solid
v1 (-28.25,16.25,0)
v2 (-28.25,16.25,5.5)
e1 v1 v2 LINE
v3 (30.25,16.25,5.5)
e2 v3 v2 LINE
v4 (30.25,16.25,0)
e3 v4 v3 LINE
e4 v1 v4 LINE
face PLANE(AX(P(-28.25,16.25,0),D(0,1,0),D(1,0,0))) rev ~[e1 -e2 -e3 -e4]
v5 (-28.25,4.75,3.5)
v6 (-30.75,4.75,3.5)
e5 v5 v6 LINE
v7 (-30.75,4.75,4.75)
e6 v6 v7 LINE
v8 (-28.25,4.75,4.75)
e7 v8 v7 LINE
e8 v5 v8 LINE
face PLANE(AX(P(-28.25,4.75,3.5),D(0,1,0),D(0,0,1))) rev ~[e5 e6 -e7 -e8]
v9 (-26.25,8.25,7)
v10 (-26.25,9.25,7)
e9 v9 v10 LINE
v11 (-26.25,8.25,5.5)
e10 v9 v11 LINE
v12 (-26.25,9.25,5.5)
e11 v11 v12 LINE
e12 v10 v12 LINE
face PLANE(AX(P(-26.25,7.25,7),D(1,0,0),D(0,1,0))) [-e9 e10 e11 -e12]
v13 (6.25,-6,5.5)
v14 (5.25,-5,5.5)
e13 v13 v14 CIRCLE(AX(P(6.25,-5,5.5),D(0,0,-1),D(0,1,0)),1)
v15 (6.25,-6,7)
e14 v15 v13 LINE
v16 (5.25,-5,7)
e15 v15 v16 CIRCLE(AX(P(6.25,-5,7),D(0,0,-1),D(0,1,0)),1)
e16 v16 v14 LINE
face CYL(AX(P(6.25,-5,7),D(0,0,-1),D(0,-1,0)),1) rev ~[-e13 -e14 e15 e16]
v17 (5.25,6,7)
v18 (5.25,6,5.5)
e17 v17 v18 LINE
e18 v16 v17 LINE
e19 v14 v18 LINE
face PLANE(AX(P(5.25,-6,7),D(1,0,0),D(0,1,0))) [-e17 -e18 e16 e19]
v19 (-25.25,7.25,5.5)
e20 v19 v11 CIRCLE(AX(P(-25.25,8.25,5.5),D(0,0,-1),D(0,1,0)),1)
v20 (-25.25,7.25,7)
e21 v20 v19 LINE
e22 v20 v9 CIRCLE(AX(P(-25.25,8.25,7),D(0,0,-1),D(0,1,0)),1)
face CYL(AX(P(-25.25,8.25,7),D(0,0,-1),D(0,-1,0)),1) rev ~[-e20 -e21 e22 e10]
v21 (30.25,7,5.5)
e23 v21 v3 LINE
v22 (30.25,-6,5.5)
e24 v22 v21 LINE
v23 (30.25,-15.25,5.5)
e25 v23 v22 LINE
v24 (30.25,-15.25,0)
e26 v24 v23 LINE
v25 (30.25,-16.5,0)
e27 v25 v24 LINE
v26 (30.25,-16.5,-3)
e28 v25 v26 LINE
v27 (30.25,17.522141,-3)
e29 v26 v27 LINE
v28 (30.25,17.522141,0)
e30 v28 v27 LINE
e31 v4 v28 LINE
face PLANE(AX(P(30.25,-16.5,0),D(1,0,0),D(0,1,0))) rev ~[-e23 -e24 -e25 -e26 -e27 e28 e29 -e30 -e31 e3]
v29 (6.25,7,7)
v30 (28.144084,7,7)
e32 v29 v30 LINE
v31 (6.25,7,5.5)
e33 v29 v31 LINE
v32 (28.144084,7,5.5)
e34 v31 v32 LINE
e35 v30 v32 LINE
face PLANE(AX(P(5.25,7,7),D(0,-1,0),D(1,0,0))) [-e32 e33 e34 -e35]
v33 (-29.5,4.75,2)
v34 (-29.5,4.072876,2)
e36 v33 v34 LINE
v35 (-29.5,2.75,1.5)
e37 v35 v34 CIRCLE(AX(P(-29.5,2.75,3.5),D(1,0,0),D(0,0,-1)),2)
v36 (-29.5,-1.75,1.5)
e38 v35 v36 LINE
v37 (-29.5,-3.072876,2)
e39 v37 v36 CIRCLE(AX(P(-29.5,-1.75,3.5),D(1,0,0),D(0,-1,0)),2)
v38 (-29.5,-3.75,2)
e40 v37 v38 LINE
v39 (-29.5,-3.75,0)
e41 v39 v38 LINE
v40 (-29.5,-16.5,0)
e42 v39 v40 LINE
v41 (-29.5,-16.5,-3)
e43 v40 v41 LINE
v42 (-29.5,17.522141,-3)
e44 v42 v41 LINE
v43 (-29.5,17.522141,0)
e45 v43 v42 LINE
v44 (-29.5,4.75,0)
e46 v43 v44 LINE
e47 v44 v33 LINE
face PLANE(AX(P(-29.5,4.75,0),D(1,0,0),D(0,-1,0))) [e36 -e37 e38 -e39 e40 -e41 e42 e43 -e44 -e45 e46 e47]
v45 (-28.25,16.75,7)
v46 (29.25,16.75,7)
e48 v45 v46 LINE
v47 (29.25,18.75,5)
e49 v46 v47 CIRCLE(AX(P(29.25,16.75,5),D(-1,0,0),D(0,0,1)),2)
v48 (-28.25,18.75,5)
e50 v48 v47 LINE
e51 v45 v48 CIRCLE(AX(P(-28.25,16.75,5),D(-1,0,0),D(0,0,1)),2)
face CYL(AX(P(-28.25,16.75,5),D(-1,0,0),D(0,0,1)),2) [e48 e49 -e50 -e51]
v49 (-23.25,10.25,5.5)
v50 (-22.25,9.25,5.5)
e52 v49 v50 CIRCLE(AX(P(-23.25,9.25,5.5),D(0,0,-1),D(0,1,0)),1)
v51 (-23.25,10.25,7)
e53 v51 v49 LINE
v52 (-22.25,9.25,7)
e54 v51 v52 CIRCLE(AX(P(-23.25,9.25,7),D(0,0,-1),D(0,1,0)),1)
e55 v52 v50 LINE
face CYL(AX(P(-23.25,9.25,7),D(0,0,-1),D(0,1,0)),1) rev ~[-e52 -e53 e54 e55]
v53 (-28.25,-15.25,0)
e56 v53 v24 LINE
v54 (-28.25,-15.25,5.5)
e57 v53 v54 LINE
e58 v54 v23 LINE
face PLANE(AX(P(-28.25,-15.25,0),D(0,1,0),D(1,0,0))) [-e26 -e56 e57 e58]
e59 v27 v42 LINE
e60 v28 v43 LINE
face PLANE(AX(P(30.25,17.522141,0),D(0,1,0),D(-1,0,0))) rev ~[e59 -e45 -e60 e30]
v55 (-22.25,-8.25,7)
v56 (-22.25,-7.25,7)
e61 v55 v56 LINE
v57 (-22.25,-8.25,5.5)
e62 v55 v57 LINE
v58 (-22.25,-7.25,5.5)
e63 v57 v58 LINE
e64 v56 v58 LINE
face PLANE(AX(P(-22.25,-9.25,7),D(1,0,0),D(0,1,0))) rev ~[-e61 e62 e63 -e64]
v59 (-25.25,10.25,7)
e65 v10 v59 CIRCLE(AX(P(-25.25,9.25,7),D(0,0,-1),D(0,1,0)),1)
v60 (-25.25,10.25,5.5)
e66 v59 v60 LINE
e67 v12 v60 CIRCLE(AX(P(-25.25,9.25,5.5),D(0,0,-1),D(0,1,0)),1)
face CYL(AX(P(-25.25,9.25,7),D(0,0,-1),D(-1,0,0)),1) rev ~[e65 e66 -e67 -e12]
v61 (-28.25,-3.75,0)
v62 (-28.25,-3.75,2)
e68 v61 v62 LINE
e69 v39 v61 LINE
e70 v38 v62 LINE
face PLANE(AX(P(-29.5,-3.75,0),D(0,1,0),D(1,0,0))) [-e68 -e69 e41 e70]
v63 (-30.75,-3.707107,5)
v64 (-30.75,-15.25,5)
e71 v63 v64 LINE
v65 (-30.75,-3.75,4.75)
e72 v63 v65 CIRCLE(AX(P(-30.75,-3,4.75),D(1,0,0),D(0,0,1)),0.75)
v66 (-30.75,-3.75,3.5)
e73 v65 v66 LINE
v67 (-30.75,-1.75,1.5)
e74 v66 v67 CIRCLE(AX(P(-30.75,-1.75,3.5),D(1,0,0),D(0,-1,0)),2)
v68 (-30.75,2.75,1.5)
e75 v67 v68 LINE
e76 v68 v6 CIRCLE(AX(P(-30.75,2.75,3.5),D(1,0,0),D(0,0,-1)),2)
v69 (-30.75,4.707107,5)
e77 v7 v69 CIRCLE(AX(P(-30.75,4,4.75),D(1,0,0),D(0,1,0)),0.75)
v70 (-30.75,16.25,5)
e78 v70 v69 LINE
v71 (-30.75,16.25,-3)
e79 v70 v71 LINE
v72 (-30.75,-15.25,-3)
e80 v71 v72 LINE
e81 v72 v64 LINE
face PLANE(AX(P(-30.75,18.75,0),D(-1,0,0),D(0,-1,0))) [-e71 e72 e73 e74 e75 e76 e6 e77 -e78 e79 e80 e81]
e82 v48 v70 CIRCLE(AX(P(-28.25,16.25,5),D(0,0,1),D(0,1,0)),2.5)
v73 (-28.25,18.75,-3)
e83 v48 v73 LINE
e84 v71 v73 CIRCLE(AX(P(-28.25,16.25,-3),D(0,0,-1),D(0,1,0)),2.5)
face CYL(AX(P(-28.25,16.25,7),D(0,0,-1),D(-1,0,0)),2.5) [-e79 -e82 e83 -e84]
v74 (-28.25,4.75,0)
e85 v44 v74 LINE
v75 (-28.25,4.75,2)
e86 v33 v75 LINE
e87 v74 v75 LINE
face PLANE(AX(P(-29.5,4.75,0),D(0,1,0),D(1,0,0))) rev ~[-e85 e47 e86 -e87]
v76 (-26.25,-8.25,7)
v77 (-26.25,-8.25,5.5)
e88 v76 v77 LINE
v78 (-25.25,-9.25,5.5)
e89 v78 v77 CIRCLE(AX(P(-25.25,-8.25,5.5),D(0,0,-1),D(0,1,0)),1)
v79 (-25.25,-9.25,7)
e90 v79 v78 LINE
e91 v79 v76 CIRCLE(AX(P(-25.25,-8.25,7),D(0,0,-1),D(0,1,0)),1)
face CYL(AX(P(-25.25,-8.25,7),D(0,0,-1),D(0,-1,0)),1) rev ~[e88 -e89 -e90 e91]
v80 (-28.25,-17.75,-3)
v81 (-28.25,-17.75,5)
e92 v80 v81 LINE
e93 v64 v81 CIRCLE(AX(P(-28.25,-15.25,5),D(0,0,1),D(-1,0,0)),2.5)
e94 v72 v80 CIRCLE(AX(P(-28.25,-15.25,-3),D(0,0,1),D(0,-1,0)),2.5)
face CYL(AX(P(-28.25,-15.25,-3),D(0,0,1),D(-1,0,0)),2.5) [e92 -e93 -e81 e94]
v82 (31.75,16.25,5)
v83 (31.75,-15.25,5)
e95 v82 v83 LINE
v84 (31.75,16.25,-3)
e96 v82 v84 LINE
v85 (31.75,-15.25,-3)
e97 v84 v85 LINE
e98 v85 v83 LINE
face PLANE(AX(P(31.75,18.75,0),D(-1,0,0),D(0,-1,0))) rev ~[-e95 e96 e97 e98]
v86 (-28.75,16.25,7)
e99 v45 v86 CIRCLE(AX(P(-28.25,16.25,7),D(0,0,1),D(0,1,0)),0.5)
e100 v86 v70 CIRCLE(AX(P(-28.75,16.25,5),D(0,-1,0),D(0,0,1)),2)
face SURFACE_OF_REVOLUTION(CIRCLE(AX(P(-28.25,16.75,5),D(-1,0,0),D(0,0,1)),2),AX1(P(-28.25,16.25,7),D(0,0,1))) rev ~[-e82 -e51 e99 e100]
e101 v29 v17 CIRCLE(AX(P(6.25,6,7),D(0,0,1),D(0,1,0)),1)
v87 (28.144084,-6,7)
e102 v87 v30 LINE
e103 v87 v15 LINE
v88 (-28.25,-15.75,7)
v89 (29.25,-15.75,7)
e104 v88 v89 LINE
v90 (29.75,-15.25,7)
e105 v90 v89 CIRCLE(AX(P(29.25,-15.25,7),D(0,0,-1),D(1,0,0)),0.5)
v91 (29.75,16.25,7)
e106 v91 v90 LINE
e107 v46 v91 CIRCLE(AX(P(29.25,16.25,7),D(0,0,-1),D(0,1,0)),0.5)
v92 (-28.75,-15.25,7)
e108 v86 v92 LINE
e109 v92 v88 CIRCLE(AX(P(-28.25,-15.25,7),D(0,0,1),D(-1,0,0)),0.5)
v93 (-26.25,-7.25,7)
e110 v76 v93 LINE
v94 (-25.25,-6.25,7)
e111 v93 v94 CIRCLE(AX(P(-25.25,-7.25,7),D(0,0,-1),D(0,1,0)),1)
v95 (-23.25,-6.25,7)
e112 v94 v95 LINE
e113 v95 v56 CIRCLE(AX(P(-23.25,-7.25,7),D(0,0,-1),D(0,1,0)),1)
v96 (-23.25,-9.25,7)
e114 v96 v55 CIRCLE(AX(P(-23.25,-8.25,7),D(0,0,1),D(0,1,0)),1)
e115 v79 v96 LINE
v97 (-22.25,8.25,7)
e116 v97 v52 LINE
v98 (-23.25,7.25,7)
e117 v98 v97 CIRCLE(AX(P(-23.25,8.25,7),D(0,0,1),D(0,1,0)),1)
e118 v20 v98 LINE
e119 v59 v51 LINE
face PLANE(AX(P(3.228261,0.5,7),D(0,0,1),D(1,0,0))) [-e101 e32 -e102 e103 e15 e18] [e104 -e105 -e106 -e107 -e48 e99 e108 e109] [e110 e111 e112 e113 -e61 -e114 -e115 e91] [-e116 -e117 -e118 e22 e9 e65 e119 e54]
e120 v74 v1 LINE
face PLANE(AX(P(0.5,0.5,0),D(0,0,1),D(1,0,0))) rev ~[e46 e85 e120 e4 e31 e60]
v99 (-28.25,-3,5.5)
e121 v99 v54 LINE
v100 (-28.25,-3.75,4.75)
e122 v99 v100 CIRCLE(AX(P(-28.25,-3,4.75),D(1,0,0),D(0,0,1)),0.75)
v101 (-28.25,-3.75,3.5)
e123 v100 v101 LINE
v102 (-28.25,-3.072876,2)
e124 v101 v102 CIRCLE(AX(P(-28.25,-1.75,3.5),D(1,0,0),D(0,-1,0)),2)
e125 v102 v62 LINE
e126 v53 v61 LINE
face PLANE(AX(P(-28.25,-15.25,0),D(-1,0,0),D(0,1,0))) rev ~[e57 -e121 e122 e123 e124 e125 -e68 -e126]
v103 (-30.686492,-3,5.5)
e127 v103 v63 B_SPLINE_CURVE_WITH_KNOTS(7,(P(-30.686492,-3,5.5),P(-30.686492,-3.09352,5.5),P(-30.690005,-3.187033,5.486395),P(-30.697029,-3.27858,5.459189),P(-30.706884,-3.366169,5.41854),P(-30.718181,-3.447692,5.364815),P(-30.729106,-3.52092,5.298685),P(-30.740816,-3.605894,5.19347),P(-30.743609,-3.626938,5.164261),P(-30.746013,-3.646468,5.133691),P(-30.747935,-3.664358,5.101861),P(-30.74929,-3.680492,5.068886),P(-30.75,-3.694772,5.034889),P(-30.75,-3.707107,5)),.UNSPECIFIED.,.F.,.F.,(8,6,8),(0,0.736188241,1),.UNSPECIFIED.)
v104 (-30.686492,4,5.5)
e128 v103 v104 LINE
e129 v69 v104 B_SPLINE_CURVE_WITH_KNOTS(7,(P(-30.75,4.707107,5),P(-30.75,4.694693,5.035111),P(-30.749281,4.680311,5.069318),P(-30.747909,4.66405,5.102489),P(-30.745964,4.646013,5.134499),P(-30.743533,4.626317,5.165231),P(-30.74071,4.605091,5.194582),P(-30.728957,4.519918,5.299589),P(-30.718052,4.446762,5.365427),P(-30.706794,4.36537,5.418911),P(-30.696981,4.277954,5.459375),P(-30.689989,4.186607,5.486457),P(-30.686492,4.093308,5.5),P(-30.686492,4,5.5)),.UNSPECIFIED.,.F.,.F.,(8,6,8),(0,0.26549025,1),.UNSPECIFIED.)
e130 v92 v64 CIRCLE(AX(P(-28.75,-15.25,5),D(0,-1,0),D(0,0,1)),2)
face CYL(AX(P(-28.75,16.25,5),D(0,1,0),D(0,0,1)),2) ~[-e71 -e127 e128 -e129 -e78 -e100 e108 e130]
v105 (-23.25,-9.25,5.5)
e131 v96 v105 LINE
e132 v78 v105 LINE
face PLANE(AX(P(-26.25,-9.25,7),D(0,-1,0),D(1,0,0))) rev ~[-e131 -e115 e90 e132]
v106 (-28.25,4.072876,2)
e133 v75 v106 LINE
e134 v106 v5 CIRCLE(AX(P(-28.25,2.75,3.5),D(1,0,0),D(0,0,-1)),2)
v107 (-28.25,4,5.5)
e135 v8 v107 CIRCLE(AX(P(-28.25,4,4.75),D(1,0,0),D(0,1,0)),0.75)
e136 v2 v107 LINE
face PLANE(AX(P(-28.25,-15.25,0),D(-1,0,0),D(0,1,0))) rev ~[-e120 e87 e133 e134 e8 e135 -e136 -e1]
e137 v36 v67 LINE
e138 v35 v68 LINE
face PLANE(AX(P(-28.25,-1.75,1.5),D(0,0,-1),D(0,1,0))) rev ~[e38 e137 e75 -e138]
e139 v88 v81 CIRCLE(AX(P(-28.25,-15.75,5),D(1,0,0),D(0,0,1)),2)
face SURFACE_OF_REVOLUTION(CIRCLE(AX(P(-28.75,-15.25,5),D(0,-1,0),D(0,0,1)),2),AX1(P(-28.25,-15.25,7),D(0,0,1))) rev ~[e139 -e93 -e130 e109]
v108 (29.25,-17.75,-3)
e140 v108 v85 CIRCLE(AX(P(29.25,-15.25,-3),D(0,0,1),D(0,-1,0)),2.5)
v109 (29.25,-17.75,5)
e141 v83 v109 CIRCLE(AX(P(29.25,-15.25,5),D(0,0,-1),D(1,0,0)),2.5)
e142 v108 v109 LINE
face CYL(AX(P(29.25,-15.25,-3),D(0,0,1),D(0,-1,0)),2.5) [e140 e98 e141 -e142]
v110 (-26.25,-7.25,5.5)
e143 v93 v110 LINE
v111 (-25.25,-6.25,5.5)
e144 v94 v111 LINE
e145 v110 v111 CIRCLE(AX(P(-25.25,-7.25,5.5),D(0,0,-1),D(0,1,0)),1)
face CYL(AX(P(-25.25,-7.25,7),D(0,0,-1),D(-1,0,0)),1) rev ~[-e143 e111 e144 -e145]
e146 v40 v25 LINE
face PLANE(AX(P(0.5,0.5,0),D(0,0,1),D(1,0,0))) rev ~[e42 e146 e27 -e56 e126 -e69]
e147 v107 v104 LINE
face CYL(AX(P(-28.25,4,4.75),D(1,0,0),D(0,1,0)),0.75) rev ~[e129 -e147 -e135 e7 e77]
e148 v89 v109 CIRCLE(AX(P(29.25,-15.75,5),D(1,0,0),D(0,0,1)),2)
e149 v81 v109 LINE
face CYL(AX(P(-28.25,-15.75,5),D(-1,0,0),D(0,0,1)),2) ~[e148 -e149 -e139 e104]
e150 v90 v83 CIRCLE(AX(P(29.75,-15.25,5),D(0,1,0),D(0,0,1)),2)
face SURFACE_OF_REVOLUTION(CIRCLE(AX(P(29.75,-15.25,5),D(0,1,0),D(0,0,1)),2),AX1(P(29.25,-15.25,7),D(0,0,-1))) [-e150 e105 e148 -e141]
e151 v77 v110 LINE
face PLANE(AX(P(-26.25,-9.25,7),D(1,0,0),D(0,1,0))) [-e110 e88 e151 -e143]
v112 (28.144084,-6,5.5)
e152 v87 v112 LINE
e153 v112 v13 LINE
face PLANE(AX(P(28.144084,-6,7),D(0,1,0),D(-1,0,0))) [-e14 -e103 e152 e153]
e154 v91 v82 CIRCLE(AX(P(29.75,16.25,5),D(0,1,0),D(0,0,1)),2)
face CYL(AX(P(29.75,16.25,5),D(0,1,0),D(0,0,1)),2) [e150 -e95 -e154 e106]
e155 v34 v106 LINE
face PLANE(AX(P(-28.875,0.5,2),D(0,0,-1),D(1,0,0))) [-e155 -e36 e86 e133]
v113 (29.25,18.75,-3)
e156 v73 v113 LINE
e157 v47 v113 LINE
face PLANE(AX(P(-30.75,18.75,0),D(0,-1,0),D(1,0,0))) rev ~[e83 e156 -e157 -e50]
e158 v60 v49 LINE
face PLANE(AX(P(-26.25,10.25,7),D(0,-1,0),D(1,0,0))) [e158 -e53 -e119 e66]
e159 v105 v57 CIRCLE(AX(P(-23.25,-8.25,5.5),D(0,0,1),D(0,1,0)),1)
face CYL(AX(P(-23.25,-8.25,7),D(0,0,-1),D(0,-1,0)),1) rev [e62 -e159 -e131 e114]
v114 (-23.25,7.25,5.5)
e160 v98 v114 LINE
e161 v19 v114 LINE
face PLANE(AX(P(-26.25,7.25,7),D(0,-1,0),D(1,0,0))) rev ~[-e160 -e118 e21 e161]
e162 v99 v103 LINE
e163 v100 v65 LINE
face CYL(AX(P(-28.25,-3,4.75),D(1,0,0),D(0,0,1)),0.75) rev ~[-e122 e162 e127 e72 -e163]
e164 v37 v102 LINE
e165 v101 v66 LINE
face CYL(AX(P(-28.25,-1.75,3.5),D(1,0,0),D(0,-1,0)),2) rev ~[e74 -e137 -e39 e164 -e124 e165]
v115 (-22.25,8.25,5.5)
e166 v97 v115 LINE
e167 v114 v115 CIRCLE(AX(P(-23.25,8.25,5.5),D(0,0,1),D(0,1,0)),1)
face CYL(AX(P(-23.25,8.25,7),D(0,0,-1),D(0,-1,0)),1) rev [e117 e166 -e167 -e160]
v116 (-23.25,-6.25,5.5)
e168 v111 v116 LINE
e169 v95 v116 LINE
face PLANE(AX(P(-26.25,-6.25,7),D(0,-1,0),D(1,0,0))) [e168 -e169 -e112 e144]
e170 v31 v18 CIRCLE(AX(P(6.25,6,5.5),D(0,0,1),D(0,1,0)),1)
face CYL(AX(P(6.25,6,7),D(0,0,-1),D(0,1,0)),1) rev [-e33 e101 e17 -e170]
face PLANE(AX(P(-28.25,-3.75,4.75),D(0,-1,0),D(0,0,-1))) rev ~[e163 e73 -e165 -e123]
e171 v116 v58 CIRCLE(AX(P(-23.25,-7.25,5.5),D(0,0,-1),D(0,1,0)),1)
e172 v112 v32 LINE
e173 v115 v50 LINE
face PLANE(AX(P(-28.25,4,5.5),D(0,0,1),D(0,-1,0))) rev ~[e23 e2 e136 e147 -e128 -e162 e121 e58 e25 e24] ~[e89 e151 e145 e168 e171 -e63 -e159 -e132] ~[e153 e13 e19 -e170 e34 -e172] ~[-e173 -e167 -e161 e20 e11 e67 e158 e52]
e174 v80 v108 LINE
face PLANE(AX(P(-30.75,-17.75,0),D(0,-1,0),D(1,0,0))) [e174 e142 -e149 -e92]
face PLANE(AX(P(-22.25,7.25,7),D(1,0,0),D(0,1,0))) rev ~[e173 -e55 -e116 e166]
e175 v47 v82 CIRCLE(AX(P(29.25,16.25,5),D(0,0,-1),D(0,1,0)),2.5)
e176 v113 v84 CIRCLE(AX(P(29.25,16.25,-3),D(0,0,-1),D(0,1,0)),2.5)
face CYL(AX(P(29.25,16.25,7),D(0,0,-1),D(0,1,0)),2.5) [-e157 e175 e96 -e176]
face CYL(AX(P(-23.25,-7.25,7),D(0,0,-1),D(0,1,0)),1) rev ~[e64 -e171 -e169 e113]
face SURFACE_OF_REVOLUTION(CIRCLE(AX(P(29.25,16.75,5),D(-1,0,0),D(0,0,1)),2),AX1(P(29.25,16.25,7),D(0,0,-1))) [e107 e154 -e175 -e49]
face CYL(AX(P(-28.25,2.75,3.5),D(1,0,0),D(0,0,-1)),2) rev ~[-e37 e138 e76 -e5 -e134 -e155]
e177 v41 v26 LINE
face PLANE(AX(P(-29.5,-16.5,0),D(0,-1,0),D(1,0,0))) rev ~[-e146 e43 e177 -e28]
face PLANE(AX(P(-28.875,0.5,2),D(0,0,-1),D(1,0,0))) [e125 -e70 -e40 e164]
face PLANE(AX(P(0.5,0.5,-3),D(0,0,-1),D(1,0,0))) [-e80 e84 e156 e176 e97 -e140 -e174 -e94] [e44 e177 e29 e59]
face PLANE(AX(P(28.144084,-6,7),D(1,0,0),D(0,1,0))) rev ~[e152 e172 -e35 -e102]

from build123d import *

# Parameters (mm, degrees)
F0_W          = 62.5
F0_H          = 36.5
F0_W_2        = 58.5
F0_H_2        = 31.5
F1_DEPTH      = 7
F2_W          = 4
F2_H          = 3
F2_W_2        = 2.1059160829
F2_H_2        = 13
F3_DEPTH      = 1.5
F4_W          = 62.5
F4_H          = 36.5
F5_DEPTH      = 3
F7_DEPTH      = 2.5
F8_R          = 2.5
F9_R          = 1
F11_T1_DEPTH  = 57.5
F11_T3_DEPTH  = 31.5
F11_T6_ANGLE  = 90
F11_T8_ANGLE  = 90
F11_T10_ANGLE = 90
F11_T12_ANGLE = 90
F12_W         = 1.25
F12_H         = 8.5
F13_DEPTH     = 2


# Not quite as in the source:
# - a fillet or chamfer that OpenCascade refuses, or shapes differently, is made with other operations: its cross-section is extruded or revolved along the edge and cut away or added
# - two fillets or chamfers of one size are made in one step


with BuildPart() as f1:
    # F0 (on Top) → F1 (new body)
    with BuildSketch(Plane.XY):
        with Locations((0.5, 0.5)):
            Rectangle(F0_W, F0_H)
        with Locations((1, 0.5)):
            Rectangle(F0_W_2, F0_H_2, mode=Mode.SUBTRACT)
    extrude(amount=F1_DEPTH)

    # F2 (on face) → F3 (join)
    with BuildSketch(Plane.XY.offset(7)):
        Polygon((30.25, 16.25), (-28.25, 16.25), (-28.25, -15.25), (30.25, -15.25), (30.25, -6), (28.1440839171, -6), (5.25, -6), (5.25, 7), (28.1440839171, 7), (30.25, 7), align=None)
        with Locations((-24.25, -7.75)):
            Rectangle(F2_W, F2_H, mode=Mode.SUBTRACT)
        with Locations((-24.25, 8.75)):
            Rectangle(F2_W, F2_H, mode=Mode.SUBTRACT)
        with Locations((29.1970419586, 0.5)):
            Rectangle(F2_W_2, F2_H_2)
    extrude(amount=-F3_DEPTH)

    # F4 (on face) → F5 (join)
    with BuildSketch(Plane(origin=(0, 0, 0), x_dir=(1, 0, 0), z_dir=(0, 0, -1))):
        with Locations((0.5, -0.5)):
            Rectangle(F4_W, F4_H)
        Polygon((-29.5, -17.522141248), (-29.5, 16.5), (30.25, 16.5), (30.25, 15.25), (30.25, -16.25), (30.25, -17.522141248), align=None, mode=Mode.SUBTRACT)
    extrude(amount=F5_DEPTH)

    # F6 (on face) → F7 (cut)
    with BuildSketch(Plane.YZ.offset(-28.25)):
        with BuildLine():
            Line((4, 5.5), (-3, 5.5))
            ThreePointArc((-3, 5.5), (-3.5303300859, 5.2803300859), (-3.75, 4.75))
            Line((-3.75, 4.75), (-3.75, 3.5))
            ThreePointArc((-3.75, 3.5), (-3.1642135624, 2.0857864376), (-1.75, 1.5))
            Line((-1.75, 1.5), (2.75, 1.5))
            ThreePointArc((2.75, 1.5), (4.1642135624, 2.0857864376), (4.75, 3.5))
            Line((4.75, 3.5), (4.75, 4.75))
            ThreePointArc((4.75, 4.75), (4.5303300859, 5.2803300859), (4, 5.5))
        make_face()
    extrude(amount=-F7_DEPTH, mode=Mode.SUBTRACT)

    # F8
    f8_edges = [f1.edges().sort_by_distance(p)[0] for p in [
        (-30.75, 18.75, 2),
        (-30.75, -17.75, 2),
        (31.75, 18.75, 2),
        (31.75, -17.75, 2),
    ]]
    fillet(f8_edges, radius=F8_R)

    # F9
    f9_edges = [f1.edges().sort_by_distance(p)[0] for p in [
        (5.25, 7, 6.25),
        (5.25, -6, 6.25),
        (-22.25, 10.25, 6.25),
        (-22.25, 7.25, 6.25),
        (-26.25, 7.25, 6.25),
        (-26.25, 10.25, 6.25),
        (-26.25, -9.25, 6.25),
        (-26.25, -6.25, 6.25),
        (-22.25, -6.25, 6.25),
        (-22.25, -9.25, 6.25),
    ]]
    fillet(f9_edges, radius=F9_R)

    # F11: fillet of radius 2 on 8 edges, made by hand

    # F11_s2 → F11_t1 (cut)
    with BuildSketch(Plane.YZ.offset(-28.25)):
        with BuildLine():
            ThreePointArc((-15.75, 7), (-17.1642135624, 6.4142135624), (-17.75, 5))
            Line((-17.75, 5), (-17.75, 7))
            Line((-17.75, 7), (-15.75, 7))
        make_face()
        with BuildLine():
            ThreePointArc((16.75, 7), (18.1642135624, 6.4142135624), (18.75, 5))
            Line((18.75, 5), (18.75, 7))
            Line((18.75, 7), (16.75, 7))
        make_face()
    extrude(amount=F11_T1_DEPTH, mode=Mode.SUBTRACT)

    # F11_s4 → F11_t3 (cut)
    with BuildSketch(Plane.XZ.offset(-16.25)):
        with BuildLine():
            ThreePointArc((29.75, 7), (31.1642135624, 6.4142135624), (31.75, 5))
            Line((31.75, 5), (31.75, 7))
            Line((31.75, 7), (29.75, 7))
        make_face()
        with BuildLine():
            ThreePointArc((-28.75, 7), (-30.1642135624, 6.4142135624), (-30.75, 5))
            Line((-30.75, 5), (-30.75, 7))
            Line((-30.75, 7), (-28.75, 7))
        make_face()
    extrude(amount=F11_T3_DEPTH, mode=Mode.SUBTRACT)

    # F11_s5 → F11_t6 (revolve, cut)
    with BuildSketch(Plane.YZ.offset(29.25)):
        with BuildLine():
            ThreePointArc((16.75, 7), (18.1642135624, 6.4142135624), (18.75, 5))
            Line((18.75, 5), (18.75, 7))
            Line((18.75, 7), (16.75, 7))
        make_face()
    revolve(axis=Axis((29.25, 16.25, 7), (0, 0, -1)), revolution_arc=F11_T6_ANGLE, mode=Mode.SUBTRACT)

    # F11_s7 → F11_t8 (revolve, cut)
    with BuildSketch(Plane.YZ.offset(-28.25)):
        with BuildLine():
            ThreePointArc((16.75, 7), (18.1642135624, 6.4142135624), (18.75, 5))
            Line((18.75, 5), (18.75, 7))
            Line((18.75, 7), (16.75, 7))
        make_face()
    revolve(axis=Axis((-28.25, 16.25, 7), (0, 0, 1)), revolution_arc=F11_T8_ANGLE, mode=Mode.SUBTRACT)

    # F11_s9 → F11_t10 (revolve, cut)
    with BuildSketch(Plane.XZ.offset(15.25)):
        with BuildLine():
            ThreePointArc((29.75, 7), (31.1642135624, 6.4142135624), (31.75, 5))
            Line((31.75, 5), (31.75, 7))
            Line((31.75, 7), (29.75, 7))
        make_face()
    revolve(axis=Axis((29.25, -15.25, 7), (0, 0, -1)), revolution_arc=F11_T10_ANGLE, mode=Mode.SUBTRACT)

    # F11_s11 → F11_t12 (revolve, cut)
    with BuildSketch(Plane.XZ.offset(15.25)):
        with BuildLine():
            ThreePointArc((-28.75, 7), (-30.1642135624, 6.4142135624), (-30.75, 5))
            Line((-30.75, 5), (-30.75, 7))
            Line((-30.75, 7), (-28.75, 7))
        make_face()
    revolve(axis=Axis((-28.25, -15.25, 7), (0, 0, 1)), revolution_arc=F11_T12_ANGLE, mode=Mode.SUBTRACT)

    # F12 (on face) → F13 (cut)
    with BuildSketch(Plane(origin=(0, 0, 0), x_dir=(1, 0, 0), z_dir=(0, 0, -1))):
        with Locations((-28.875, -0.5)):
            Rectangle(F12_W, F12_H)
    extrude(amount=-F13_DEPTH, mode=Mode.SUBTRACT)


solid = f1.part
